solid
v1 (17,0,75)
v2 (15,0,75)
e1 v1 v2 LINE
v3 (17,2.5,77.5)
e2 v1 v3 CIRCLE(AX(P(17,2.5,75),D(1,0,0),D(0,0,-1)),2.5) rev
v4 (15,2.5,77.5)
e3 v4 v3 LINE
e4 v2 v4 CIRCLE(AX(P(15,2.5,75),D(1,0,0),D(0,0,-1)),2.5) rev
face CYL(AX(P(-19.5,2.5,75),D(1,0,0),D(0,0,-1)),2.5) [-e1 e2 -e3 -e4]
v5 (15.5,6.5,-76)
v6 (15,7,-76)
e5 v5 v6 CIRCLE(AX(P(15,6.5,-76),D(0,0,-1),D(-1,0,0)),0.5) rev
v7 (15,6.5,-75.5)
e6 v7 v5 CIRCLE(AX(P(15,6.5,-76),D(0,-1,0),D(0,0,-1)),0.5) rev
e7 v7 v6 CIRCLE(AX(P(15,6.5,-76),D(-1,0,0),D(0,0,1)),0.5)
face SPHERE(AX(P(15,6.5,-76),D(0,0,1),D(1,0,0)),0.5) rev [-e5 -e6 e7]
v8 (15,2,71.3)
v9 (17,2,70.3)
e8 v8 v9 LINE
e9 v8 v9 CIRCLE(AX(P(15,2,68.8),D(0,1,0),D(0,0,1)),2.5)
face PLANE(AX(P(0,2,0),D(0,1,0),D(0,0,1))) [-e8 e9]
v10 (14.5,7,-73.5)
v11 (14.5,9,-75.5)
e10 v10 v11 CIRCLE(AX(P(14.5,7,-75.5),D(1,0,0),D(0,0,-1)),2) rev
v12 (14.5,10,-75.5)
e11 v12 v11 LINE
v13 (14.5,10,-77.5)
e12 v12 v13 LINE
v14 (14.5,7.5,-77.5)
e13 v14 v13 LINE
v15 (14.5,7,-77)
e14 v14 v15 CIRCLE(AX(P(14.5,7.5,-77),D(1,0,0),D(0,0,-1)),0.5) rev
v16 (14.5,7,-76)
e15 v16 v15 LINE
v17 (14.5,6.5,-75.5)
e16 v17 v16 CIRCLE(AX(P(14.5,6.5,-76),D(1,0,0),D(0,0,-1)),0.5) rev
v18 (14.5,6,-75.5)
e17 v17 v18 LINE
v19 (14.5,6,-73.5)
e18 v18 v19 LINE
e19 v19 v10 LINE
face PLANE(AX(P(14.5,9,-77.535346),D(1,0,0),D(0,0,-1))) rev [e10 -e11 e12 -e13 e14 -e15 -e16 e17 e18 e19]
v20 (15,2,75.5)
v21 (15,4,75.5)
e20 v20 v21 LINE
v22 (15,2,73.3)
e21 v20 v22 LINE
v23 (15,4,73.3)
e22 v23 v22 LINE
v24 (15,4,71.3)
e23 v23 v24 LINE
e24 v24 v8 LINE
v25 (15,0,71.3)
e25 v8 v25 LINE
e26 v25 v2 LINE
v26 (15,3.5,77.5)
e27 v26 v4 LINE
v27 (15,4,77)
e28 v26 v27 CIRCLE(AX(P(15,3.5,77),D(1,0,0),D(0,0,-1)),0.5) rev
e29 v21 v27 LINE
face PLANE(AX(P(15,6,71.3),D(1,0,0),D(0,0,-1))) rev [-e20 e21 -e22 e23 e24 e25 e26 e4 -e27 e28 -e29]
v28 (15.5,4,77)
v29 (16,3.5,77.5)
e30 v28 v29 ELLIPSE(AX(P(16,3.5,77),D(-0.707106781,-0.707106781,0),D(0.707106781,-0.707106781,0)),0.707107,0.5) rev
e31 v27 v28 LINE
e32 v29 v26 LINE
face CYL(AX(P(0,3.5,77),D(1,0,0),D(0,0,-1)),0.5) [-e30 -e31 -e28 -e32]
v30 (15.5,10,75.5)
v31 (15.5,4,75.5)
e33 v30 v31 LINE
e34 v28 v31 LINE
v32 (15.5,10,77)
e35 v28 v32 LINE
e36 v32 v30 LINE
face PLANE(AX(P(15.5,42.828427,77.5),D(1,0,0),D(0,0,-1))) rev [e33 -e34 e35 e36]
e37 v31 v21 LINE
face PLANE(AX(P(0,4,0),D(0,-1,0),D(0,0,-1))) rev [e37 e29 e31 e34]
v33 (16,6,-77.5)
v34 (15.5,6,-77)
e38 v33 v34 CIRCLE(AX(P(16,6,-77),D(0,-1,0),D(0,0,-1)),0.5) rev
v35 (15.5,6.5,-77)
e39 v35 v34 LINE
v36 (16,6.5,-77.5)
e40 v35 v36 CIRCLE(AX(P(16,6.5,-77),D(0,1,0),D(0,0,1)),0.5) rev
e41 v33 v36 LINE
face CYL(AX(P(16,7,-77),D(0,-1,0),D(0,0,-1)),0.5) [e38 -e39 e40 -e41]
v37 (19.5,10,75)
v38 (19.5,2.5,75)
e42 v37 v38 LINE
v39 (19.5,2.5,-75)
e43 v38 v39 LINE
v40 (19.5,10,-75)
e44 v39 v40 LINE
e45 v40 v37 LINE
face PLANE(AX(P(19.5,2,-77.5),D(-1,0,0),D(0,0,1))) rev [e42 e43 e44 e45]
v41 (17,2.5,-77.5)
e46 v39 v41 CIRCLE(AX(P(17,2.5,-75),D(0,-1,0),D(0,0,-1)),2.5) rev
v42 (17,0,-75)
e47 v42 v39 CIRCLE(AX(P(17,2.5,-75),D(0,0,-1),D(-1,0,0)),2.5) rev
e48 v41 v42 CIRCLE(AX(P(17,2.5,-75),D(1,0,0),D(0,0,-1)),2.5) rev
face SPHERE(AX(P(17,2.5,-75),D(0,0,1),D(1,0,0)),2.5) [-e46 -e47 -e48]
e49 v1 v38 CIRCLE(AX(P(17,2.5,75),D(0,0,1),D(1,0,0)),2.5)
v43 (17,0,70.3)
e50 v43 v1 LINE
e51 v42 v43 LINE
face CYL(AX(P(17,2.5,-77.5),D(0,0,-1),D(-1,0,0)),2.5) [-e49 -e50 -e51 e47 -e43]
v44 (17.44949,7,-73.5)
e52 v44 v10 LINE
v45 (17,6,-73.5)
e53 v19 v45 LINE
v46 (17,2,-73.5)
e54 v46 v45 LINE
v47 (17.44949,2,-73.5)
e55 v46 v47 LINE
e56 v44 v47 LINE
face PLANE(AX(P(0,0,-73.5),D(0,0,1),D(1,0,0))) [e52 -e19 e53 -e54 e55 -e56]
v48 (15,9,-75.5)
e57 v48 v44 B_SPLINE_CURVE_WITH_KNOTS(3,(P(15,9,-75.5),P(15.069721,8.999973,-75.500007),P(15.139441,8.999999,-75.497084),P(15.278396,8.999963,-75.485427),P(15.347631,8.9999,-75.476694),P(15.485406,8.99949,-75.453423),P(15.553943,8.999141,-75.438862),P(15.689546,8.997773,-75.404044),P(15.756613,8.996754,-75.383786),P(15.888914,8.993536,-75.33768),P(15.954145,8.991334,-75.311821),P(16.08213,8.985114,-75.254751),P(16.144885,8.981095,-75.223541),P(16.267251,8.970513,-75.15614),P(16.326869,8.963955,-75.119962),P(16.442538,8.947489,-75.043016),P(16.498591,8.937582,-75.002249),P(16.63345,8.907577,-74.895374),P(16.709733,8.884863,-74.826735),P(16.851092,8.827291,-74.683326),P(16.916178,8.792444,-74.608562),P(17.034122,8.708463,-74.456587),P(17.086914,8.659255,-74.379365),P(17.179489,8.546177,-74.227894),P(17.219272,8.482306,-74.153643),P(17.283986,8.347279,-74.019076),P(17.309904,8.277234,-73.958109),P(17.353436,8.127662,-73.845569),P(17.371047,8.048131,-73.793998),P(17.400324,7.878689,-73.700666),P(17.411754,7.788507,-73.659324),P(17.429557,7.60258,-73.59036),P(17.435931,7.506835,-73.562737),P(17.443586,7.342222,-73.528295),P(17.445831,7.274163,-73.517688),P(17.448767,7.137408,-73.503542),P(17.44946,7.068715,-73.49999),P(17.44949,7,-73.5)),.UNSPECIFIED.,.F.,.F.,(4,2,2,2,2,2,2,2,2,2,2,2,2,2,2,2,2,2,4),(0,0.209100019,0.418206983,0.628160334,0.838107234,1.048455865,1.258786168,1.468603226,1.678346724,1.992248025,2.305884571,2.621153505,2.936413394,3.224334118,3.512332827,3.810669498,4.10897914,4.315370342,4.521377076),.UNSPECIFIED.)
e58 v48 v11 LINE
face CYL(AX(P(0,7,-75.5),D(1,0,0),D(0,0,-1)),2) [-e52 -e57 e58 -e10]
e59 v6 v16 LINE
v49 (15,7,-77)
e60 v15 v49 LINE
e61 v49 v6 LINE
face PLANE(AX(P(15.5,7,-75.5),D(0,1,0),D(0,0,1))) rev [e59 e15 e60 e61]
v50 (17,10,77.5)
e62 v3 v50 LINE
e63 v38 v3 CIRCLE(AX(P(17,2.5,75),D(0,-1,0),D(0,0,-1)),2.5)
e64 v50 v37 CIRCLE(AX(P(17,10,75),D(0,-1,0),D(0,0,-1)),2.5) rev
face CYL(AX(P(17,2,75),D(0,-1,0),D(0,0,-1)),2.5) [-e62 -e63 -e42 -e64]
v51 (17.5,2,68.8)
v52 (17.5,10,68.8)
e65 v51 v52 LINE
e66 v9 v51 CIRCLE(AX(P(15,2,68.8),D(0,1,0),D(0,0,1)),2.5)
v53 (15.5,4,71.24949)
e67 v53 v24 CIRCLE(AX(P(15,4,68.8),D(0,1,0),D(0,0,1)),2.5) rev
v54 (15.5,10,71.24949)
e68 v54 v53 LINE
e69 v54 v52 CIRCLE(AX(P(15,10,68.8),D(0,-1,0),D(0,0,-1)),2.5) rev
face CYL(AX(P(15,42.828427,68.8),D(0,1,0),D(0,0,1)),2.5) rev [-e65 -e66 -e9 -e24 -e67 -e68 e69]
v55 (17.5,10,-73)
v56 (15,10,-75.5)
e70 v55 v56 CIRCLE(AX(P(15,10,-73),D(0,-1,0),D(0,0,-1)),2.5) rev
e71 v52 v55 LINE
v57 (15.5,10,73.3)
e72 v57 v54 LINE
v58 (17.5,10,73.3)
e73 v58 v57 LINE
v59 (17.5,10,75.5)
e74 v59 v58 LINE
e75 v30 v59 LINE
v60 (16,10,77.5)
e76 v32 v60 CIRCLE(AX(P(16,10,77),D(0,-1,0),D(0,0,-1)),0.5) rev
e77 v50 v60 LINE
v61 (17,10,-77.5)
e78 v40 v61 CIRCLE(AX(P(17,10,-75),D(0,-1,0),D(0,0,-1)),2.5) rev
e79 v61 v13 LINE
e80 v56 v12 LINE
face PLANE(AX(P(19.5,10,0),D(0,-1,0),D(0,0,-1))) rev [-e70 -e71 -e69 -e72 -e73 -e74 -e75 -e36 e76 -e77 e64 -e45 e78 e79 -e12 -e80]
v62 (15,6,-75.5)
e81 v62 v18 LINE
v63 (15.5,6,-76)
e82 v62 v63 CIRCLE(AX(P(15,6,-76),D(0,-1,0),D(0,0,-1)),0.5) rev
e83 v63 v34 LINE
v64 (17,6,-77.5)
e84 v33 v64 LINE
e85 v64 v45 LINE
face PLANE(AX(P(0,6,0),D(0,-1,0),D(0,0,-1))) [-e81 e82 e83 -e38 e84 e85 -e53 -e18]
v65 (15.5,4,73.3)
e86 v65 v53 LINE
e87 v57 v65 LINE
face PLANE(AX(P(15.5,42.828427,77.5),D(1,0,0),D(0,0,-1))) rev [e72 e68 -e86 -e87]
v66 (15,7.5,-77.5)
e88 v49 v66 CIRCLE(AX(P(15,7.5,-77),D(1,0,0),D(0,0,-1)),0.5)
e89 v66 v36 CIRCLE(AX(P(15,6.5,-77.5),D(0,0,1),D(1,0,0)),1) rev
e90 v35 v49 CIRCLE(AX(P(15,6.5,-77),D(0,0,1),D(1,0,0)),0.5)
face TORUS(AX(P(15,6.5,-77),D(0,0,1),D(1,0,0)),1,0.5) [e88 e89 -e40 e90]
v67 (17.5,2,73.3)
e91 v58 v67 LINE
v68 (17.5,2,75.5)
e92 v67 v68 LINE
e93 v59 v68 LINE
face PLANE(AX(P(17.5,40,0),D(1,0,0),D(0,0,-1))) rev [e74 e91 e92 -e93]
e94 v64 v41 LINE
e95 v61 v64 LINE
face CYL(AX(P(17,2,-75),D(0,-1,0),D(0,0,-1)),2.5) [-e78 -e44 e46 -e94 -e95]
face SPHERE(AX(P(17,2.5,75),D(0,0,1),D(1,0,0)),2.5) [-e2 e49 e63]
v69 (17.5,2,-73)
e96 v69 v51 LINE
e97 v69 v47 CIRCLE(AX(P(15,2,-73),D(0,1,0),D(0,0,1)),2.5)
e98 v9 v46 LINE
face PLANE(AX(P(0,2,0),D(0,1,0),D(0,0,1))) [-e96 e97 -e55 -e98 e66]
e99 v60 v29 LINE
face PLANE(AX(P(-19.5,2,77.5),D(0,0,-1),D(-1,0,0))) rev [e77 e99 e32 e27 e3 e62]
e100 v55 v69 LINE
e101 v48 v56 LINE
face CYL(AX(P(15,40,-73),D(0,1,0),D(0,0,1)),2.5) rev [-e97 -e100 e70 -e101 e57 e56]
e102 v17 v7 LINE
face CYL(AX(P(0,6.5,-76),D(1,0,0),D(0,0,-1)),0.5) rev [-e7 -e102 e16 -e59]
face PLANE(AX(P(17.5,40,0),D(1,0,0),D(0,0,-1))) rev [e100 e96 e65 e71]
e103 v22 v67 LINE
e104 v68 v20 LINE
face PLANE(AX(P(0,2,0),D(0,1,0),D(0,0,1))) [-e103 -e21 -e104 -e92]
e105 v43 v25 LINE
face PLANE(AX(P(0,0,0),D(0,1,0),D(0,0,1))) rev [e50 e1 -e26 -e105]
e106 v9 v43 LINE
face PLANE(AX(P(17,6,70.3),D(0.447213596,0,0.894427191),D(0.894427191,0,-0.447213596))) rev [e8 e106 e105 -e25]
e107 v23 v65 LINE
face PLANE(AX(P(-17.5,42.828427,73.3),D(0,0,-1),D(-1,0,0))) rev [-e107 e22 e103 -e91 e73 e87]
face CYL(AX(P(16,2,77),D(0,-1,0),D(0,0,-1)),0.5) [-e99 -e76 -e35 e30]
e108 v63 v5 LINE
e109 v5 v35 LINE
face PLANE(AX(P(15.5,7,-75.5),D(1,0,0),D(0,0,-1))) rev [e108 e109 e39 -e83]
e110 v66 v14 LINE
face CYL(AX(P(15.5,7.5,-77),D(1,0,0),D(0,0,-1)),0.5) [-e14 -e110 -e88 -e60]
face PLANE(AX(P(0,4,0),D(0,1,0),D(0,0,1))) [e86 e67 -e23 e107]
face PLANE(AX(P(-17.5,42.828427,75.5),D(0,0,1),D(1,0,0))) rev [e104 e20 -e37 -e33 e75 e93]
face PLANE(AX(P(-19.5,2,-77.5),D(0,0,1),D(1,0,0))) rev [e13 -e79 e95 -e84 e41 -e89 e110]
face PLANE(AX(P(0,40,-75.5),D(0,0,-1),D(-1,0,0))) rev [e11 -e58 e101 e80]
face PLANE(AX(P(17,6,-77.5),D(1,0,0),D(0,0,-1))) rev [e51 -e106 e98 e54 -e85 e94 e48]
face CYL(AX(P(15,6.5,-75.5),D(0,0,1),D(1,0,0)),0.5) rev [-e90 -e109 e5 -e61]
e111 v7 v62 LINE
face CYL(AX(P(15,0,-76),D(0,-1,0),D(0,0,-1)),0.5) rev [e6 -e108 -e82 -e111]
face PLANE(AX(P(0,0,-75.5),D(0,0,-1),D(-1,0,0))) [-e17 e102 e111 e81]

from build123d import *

# Parameters (mm, degrees)
SKETCH1_W                       = 39
SKETCH1_H                       = 155
BOSS_EXTRUDE1_DEPTH             = 2
BOSS_EXTRUDE2_DEPTH             = 38
SKETCH3_W                       = 2
SKETCH3_H                       = 2
BOSS_EXTRUDE3_DEPTH             = 38
SKETCH4_W                       = 2
SKETCH4_H                       = 2
BOSS_EXTRUDE4_DEPTH             = 151
SKETCH6_W                       = 35
SKETCH6_H                       = 2.2
CUT_EXTRUDE1_DEPTH              = 160.340045186
SKETCH7_W                       = 35
SKETCH7_H                       = 2.2
CUT_EXTRUDE2_DEPTH              = 89.490112442
SKETCH5_W                       = 31
SKETCH5_H                       = 2
BOSS_EXTRUDE5_DEPTH             = 2
BOSS_EXTRUDE6_REACH             = 91.367
SKETCH8_W                       = 2
SKETCH8_H                       = 2
BOSS_EXTRUDE6_DIRECTION_2_REACH = 91.367
SKETCH10_W                      = 2
SKETCH10_H                      = 2.2
SKETCH10_W_2                    = 2.2
SKETCH10_H_2                    = 2
BOSS_EXTRUDE8_DEPTH             = 2
SKETCH11_W                      = 2
SKETCH11_H                      = 2.2
SKETCH11_W_2                    = 2.2
SKETCH11_H_2                    = 2
BOSS_EXTRUDE9_DEPTH             = 2
FILLET2_R                       = 2.5
SKETCH14_W                      = 36.5
SKETCH14_H                      = 7.75
BOSS_EXTRUDE10_DEPTH            = 2
SKETCH13_W                      = 31
SKETCH13_H                      = 3
CUT_EXTRUDE4_DEPTH              = 2
FILLET3_R                       = 2
FILLET4_R                       = 0.5
SKETCH15_R                      = 5.1
CUT_EXTRUDE5_DEPTH              = 90.367219941
SKETCH16_R                      = 7.1
BOSS_EXTRUDE11_DEPTH            = 1
FILLET5_R                       = 0.5
CUT_EXTRUDE3_DEPTH              = 160.340045186
FILLET6_R                       = 0.4
FILLET7_R                       = 0.5
CUT_EXTRUDE6_DEPTH              = 6
SKETCH18_W                      = 29
SKETCH18_H                      = 3
CUT_EXTRUDE8_DEPTH              = 90.367220028
CUT_EXTRUDE11_DEPTH             = 90.367220028
CUT_EXTRUDE11_DEPTH_BACK        = 90.367220028
SKETCH20_W                      = 29
SKETCH20_H                      = 34
SKETCH21_W                      = 155
SKETCH21_H                      = 20
SKETCH21_H_2                    = 10
CUT_EXTRUDE12_DEPTH             = 90.367219941


with BuildPart() as part:
    # Sketch1 → Boss-Extrude1 (new body)
    with BuildSketch(Plane(origin=(0, 0, 0), x_dir=(1, 0, 0), z_dir=(0, 1, 0))):
        Rectangle(SKETCH1_W, SKETCH1_H)
    extrude(amount=BOSS_EXTRUDE1_DEPTH)

    # Sketch2 → Boss-Extrude2 (add)
    with BuildSketch(Plane(origin=(0, 2, 0), x_dir=(1, 0, 0), z_dir=(0, 1, 0))):
        Polygon((-17.5, -77.5), (-17.5, -75.5), (-17.5, 75.5), (17.5, 75.5), (17.5, -75.5), (17.5, -77.5), (19.5, -77.5), (19.5, 77.5), (-19.5, 77.5), (-19.5, -77.5), align=None)
    extrude(amount=BOSS_EXTRUDE2_DEPTH)

    # Sketch3 → Boss-Extrude3 (add)
    with BuildSketch(Plane(origin=(0, 2, 0), x_dir=(1, 0, 0), z_dir=(0, 1, 0))):
        with Locations((-16.5, -76.5)):
            Rectangle(SKETCH3_W, SKETCH3_H)
        with Locations((-16.5, -72.3)):
            Rectangle(SKETCH3_W, SKETCH3_H)
        with Locations((16.5, -76.5)):
            Rectangle(SKETCH3_W, SKETCH3_H)
        with Locations((16.5, -72.3)):
            Rectangle(SKETCH3_W, SKETCH3_H)
    extrude(amount=BOSS_EXTRUDE3_DEPTH)

    # Sketch4 → Boss-Extrude4 (add)
    with BuildSketch(Plane.XY.offset(-75.5)):
        with Locations((-16.5, 39)):
            Rectangle(SKETCH4_W, SKETCH4_H)
        Polygon((-15.5, 33.8), (-17.5, 31.8), (-17.5, 35.8), (-15.5, 35.8), align=None)
        Polygon((15.5, 35.8), (17.5, 35.8), (17.5, 31.8), (15.5, 33.8), align=None)
        with Locations((16.5, 39)):
            Rectangle(SKETCH4_W, SKETCH4_H)
    extrude(amount=BOSS_EXTRUDE4_DEPTH)

    # Sketch6 → Cut-Extrude1 (cut, through all)
    with BuildSketch(Plane.XY.offset(-75.5)):
        with Locations((0, 36.9)):
            Rectangle(SKETCH6_W, SKETCH6_H)
    extrude(amount=CUT_EXTRUDE1_DEPTH, mode=Mode.SUBTRACT)

    # Sketch7 → Cut-Extrude2 (cut, through all)
    with BuildSketch(Plane(origin=(0, 2, 0), x_dir=(1, 0, 0), z_dir=(0, 1, 0))):
        with Locations((0, -74.4)):
            Rectangle(SKETCH7_W, SKETCH7_H)
    extrude(amount=CUT_EXTRUDE2_DEPTH, mode=Mode.SUBTRACT)

    # Sketch5 → Boss-Extrude5 (add)
    with BuildSketch(Plane(origin=(0, 2, 0), x_dir=(1, 0, 0), z_dir=(0, 1, 0))):
        with Locations((0, -76.5)):
            Rectangle(SKETCH5_W, SKETCH5_H)
        with Locations((0, -72.3)):
            Rectangle(SKETCH5_W, SKETCH5_H)
    extrude(amount=BOSS_EXTRUDE5_DEPTH)

    # Boss-Extrude6: up to this face of the body (flat: up to its plane)
    boss_extrude6_end = Plane(part.part.faces().sort_by_distance((17.5, 16.9, -2.1))[0])
    # Sketch8 → Boss-Extrude6 (add, up to the picked face)
    with BuildSketch(Plane(origin=(0, 0, 0), x_dir=(0, 0, -1), z_dir=(1, 0, 0)), mode=Mode.PRIVATE) as boss_extrude6_sk1:
        with Locations((74.5, 39)):
            Rectangle(SKETCH8_W, SKETCH8_H)
    boss_extrude6_tool1 = split(extrude(boss_extrude6_sk1.sketch, amount=BOSS_EXTRUDE6_REACH, mode=Mode.PRIVATE), bisect_by=boss_extrude6_end, keep=Keep.BOTH, mode=Mode.PRIVATE)
    # Sketch8 → Boss-Extrude6 (add, up to the picked face)
    with BuildSketch(Plane(origin=(0, 0, 0), x_dir=(0, 0, -1), z_dir=(1, 0, 0)), mode=Mode.PRIVATE) as boss_extrude6_sk2:
        Polygon((75.5, 35.8), (73.5, 35.8), (73.5, 33.8), (75.5, 31.8), align=None)
    boss_extrude6_tool2 = split(extrude(boss_extrude6_sk2.sketch, amount=BOSS_EXTRUDE6_REACH, mode=Mode.PRIVATE), bisect_by=boss_extrude6_end, keep=Keep.BOTH, mode=Mode.PRIVATE)
    add(boss_extrude6_tool1.solids().sort_by(Axis((0, 39, -74.5), (1, 0, 0)))[0])
    add(boss_extrude6_tool2.solids().sort_by(Axis((0, 34.244444, -74.611111), (1, 0, 0)))[0])

    # Boss-Extrude6 direction 2: up to this face of the body (flat: up to its plane)
    boss_extrude6_direction_2_end = Plane(part.part.faces().sort_by_distance((-17.5, 16.9, -2.1))[0])
    # Sketch8 → Boss-Extrude6 direction 2 (add, up to the picked face)
    with BuildSketch(Plane(origin=(0, 0, 0), x_dir=(0, 0, -1), z_dir=(1, 0, 0)), mode=Mode.PRIVATE) as boss_extrude6_direction_2_sk1:
        with Locations((74.5, 39)):
            Rectangle(SKETCH8_W, SKETCH8_H)
    boss_extrude6_direction_2_tool1 = split(extrude(boss_extrude6_direction_2_sk1.sketch, amount=-BOSS_EXTRUDE6_DIRECTION_2_REACH, mode=Mode.PRIVATE), bisect_by=boss_extrude6_direction_2_end, keep=Keep.BOTH, mode=Mode.PRIVATE)
    # Sketch8 → Boss-Extrude6 direction 2 (add, up to the picked face)
    with BuildSketch(Plane(origin=(0, 0, 0), x_dir=(0, 0, -1), z_dir=(1, 0, 0)), mode=Mode.PRIVATE) as boss_extrude6_direction_2_sk2:
        Polygon((75.5, 35.8), (73.5, 35.8), (73.5, 33.8), (75.5, 31.8), align=None)
    boss_extrude6_direction_2_tool2 = split(extrude(boss_extrude6_direction_2_sk2.sketch, amount=-BOSS_EXTRUDE6_DIRECTION_2_REACH, mode=Mode.PRIVATE), bisect_by=boss_extrude6_direction_2_end, keep=Keep.BOTH, mode=Mode.PRIVATE)
    add(boss_extrude6_direction_2_tool1.solids().sort_by(Axis((0, 39, -74.5), (-1, 0, 0)))[0])
    add(boss_extrude6_direction_2_tool2.solids().sort_by(Axis((0, 34.244444, -74.611111), (-1, 0, 0)))[0])

    # Sketch10 → Boss-Extrude8 (add)
    with BuildSketch(Plane(origin=(-17.5, 0, 0), x_dir=(0, 0, -1), z_dir=(1, 0, 0))):
        with Locations((-76.5, 36.9)):
            Rectangle(SKETCH10_W, SKETCH10_H)
        with Locations((-74.4, 39)):
            Rectangle(SKETCH10_W_2, SKETCH10_H_2)
    extrude(amount=BOSS_EXTRUDE8_DEPTH)

    # Sketch11 → Boss-Extrude9 (add)
    with BuildSketch(Plane.ZY.offset(-17.5)):
        with Locations((76.5, 36.9)):
            Rectangle(SKETCH11_W, SKETCH11_H)
        with Locations((74.4, 39)):
            Rectangle(SKETCH11_W_2, SKETCH11_H_2)
    extrude(amount=BOSS_EXTRUDE9_DEPTH)

    # Fillet2
    fillet2_edges = [part.edges().sort_by_distance(p)[0] for p in [
        (-17.5, 16.9, 71.3),
        (17.5, 16.9, 71.3),
        (19.5, 20, 77.5),
        (-19.5, 20, 77.5),
        (-19.5, 20, -77.5),
        (-17.5, 16.9, -75.5),
        (17.5, 16.9, -75.5),
        (19.5, 20, -77.5),
        (19.5, 40, 0),
        (-19.5, 40, 0),
        (19.5, 0, 0),
        (-19.5, 0, 0),
        (0, 40, -77.5),
        (0, 0, 77.5),
        (0, 0, -77.5),
        (-17.5, 40, 77.5),
        (17.5, 40, 77.5),
    ]]
    fillet(fillet2_edges, radius=FILLET2_R)

    # Sketch14 → Boss-Extrude10 (add)
    with BuildSketch(Plane.XY.offset(-75.5)):
        with Locations((0, 5.125)):
            Rectangle(SKETCH14_W, SKETCH14_H)
    extrude(amount=BOSS_EXTRUDE10_DEPTH)

    # Sketch13 → Cut-Extrude4 (cut)
    with BuildSketch(Plane(origin=(0, 0, -77.5), x_dir=(-1, 0, 0), z_dir=(0, 0, -1))):
        with Locations((0, 5.5)):
            Rectangle(SKETCH13_W, SKETCH13_H)
    extrude(amount=-CUT_EXTRUDE4_DEPTH, mode=Mode.SUBTRACT)

    # Fillet3
    fillet3_edges = [part.edges().sort_by_distance(p)[0] for p in [
        (0, 9, -73.5),
    ]]
    fillet(fillet3_edges, radius=FILLET3_R - 0.0001)  # a hair under: the kernel refuses the full size

    # Fillet4
    fillet4_edges = [part.edges().sort_by_distance(p)[0] for p in [
        (15.5, 5.5, -75.5),
        (15.5, 4, -76.5),
        (0, 7, -75.5),
        (15.5, 7, -76.5),
        (-15.5, 5.5, -75.5),
        (-15.5, 7, -76.5),
        (0, 4, -75.5),
        (-15.5, 4, -76.5),
        (15.5, 5.5, -77.5),
        (0, 4, -77.5),
        (-15.5, 5.5, -77.5),
        (0, 7, -77.5),
    ]]
    fillet(fillet4_edges, radius=FILLET4_R)

    # Sketch15 → Cut-Extrude5 (cut, through all)
    with BuildSketch(Plane.XZ):
        with Locations(Location((0, 38.75, 0), (0, 0, 270))):
            Circle(SKETCH15_R)
        with Locations(Location((0, -38.75, 0), (0, 0, 270))):
            Circle(SKETCH15_R)
    extrude(amount=-CUT_EXTRUDE5_DEPTH, mode=Mode.SUBTRACT)

    # Sketch16 → Boss-Extrude11 (add)
    with BuildSketch(Plane(origin=(0, 2, 0), x_dir=(1, 0, 0), z_dir=(0, 1, 0))):
        with Locations(Location((0, 38.75, 0), (0, 0, 270))):
            Circle(SKETCH16_R)
        with Locations(Location((0, -38.75, 0), (0, 0, 270))):
            Circle(SKETCH16_R)
    extrude(amount=BOSS_EXTRUDE11_DEPTH)

    # Fillet5
    fillet5_edges = [part.edges().sort_by_distance(p)[0] for p in [
        (0, 2, -45.85),
        (0, 3, -45.85),
        (0, 2, 31.65),
        (0, 3, 31.65),
    ]]
    fillet(fillet5_edges, radius=FILLET5_R - 0.0001)  # a hair under: the kernel refuses the full size

    # Sketch12 → Cut-Extrude3 (cut, through all)
    with BuildSketch(Plane.XY.offset(-75.5)):
        with BuildLine():
            Line((1.668907005, 12.688040659), (2.22520934, 10.250720878))
            ThreePointArc((2.22520934, 10.250720878), (4.338837391, 10.990311321), (6.234898019, 12.181685175))
            Line((6.234898019, 12.181685175), (4.676173514, 14.136263881))
            ThreePointArc((4.676173514, 14.136263881), (3.254128043, 13.242733491), (1.668907005, 12.688040659))
        make_face()
        with BuildLine():
            ThreePointArc((-6.234898019, 12.181685175), (-4.338837391, 10.990311321), (-2.22520934, 10.250720878))
            Line((-2.22520934, 10.250720878), (-1.668907005, 12.688040659))
            ThreePointArc((-1.668907005, 12.688040659), (-3.254128043, 13.242733491), (-4.676173514, 14.136263881))
            Line((-4.676173514, 14.136263881), (-6.234898019, 12.181685175))
        make_face()
        with BuildLine():
            ThreePointArc((-10, 20), (-9.749279122, 17.77479066), (-9.009688679, 15.661162609))
            Line((-9.009688679, 15.661162609), (-6.757266509, 16.745871957))
            ThreePointArc((-6.757266509, 16.745871957), (-7.311959341, 18.331092995), (-7.5, 20))
            Line((-7.5, 20), (-10, 20))
        make_face()
        with BuildLine():
            ThreePointArc((-6.234898019, 27.818314825), (-7.818314825, 26.234898019), (-9.009688679, 24.338837391))
            Line((-9.009688679, 24.338837391), (-6.757266509, 23.254128043))
            ThreePointArc((-6.757266509, 23.254128043), (-5.863736119, 24.676173514), (-4.676173514, 25.863736119))
            Line((-4.676173514, 25.863736119), (-6.234898019, 27.818314825))
        make_face()
        with BuildLine():
            ThreePointArc((-1.668907005, 27.311959341), (-0.839733571, 27.452841574), (0, 27.5))
            Line((0, 27.5), (0, 30))
            ThreePointArc((0, 30), (-1.119644761, 29.937122099), (-2.22520934, 29.749279122))
            Line((-2.22520934, 29.749279122), (-1.668907005, 27.311959341))
        make_face()
        with BuildLine():
            Line((0, 30), (0, 27.5))
            ThreePointArc((0, 27.5), (0.839733571, 27.452841574), (1.668907005, 27.311959341))
            Line((1.668907005, 27.311959341), (2.22520934, 29.749279122))
            ThreePointArc((2.22520934, 29.749279122), (1.119644761, 29.937122099), (0, 30))
        make_face()
        with BuildLine():
            Line((6.757266509, 23.254128043), (9.009688679, 24.338837391))
            ThreePointArc((9.009688679, 24.338837391), (7.818314825, 26.234898019), (6.234898019, 27.818314825))
            Line((6.234898019, 27.818314825), (4.676173514, 25.863736119))
            ThreePointArc((4.676173514, 25.863736119), (5.863736119, 24.676173514), (6.757266509, 23.254128043))
        make_face()
        with BuildLine():
            Line((6.757266509, 16.745871957), (9.009688679, 15.661162609))
            ThreePointArc((9.009688679, 15.661162609), (9.749279122, 17.77479066), (10, 20))
            Line((10, 20), (7.5, 20))
            ThreePointArc((7.5, 20), (7.311959341, 18.331092995), (6.757266509, 16.745871957))
        make_face()
        with BuildLine():
            ThreePointArc((2.5, 20), (2.43731978, 19.443697665), (2.25242217, 18.915290652))
            Line((2.25242217, 18.915290652), (4.50484434, 17.830581304))
            ThreePointArc((4.50484434, 17.830581304), (4.874639561, 18.88739533), (5, 20))
            Line((5, 20), (2.5, 20))
        make_face()
        with BuildLine():
            ThreePointArc((1.558724505, 21.954578706), (1.954578706, 21.558724505), (2.25242217, 21.084709348))
            Line((2.25242217, 21.084709348), (4.50484434, 22.169418696))
            ThreePointArc((4.50484434, 22.169418696), (3.909157412, 23.117449009), (3.117449009, 23.909157412))
            Line((3.117449009, 23.909157412), (1.558724505, 21.954578706))
        make_face()
        with BuildLine():
            Line((0, 25), (0, 22.5))
            ThreePointArc((0, 22.5), (0.27991119, 22.484280525), (0.556302335, 22.43731978))
            Line((0.556302335, 22.43731978), (1.11260467, 24.874639561))
            ThreePointArc((1.11260467, 24.874639561), (0.559822381, 24.968561049), (0, 25))
        make_face()
        with BuildLine():
            ThreePointArc((-0.556302335, 22.43731978), (-0.27991119, 22.484280525), (0, 22.5))
            Line((0, 22.5), (0, 25))
            ThreePointArc((0, 25), (-0.559822381, 24.968561049), (-1.11260467, 24.874639561))
            Line((-1.11260467, 24.874639561), (-0.556302335, 22.43731978))
        make_face()
        with BuildLine():
            ThreePointArc((-2.25242217, 21.084709348), (-1.954578706, 21.558724505), (-1.558724505, 21.954578706))
            Line((-1.558724505, 21.954578706), (-3.117449009, 23.909157412))
            ThreePointArc((-3.117449009, 23.909157412), (-3.909157412, 23.117449009), (-4.50484434, 22.169418696))
            Line((-4.50484434, 22.169418696), (-2.25242217, 21.084709348))
        make_face()
        with BuildLine():
            ThreePointArc((-2.25242217, 18.915290652), (-2.43731978, 19.443697665), (-2.5, 20))
            Line((-2.5, 20), (-5, 20))
            ThreePointArc((-5, 20), (-4.874639561, 18.88739533), (-4.50484434, 17.830581304))
            Line((-4.50484434, 17.830581304), (-2.25242217, 18.915290652))
        make_face()
        with BuildLine():
            ThreePointArc((-3.117449009, 16.090842588), (-2.169418696, 15.49515566), (-1.11260467, 15.125360439))
            Line((-1.11260467, 15.125360439), (-0.556302335, 17.56268022))
            ThreePointArc((-0.556302335, 17.56268022), (-1.084709348, 17.74757783), (-1.558724505, 18.045421294))
            Line((-1.558724505, 18.045421294), (-3.117449009, 16.090842588))
        make_face()
        with BuildLine():
            Line((0.556302335, 17.56268022), (1.11260467, 15.125360439))
            ThreePointArc((1.11260467, 15.125360439), (2.169418696, 15.49515566), (3.117449009, 16.090842588))
            Line((3.117449009, 16.090842588), (1.558724505, 18.045421294))
            ThreePointArc((1.558724505, 18.045421294), (1.084709348, 17.74757783), (0.556302335, 17.56268022))
        make_face()
    extrude(amount=-CUT_EXTRUDE3_DEPTH, mode=Mode.SUBTRACT)

    # Fillet6
    fillet6_edges = [part.edges().sort_by_distance(p)[0] for p in [
        (5.863736119, 24.676173514, -75.5),
        (5.455535766, 26.841025472, -75.5),
        (7.818314825, 26.234898019, -77.5),
        (7.883477594, 23.796482717, -77.5),
        (5.863736119, 24.676173514, -77.5),
        (5.455535766, 26.841025472, -77.5),
        (7.883477594, 23.796482717, -75.5),
        (7.818314825, 26.234898019, -75.5),
        (7.311959341, 18.331092995, -75.5),
        (8.75, 20, -75.5),
        (9.749279122, 17.77479066, -77.5),
        (7.883477594, 16.203517283, -77.5),
        (7.311959341, 18.331092995, -77.5),
        (8.75, 20, -77.5),
        (7.883477594, 16.203517283, -75.5),
        (9.749279122, 17.77479066, -75.5),
        (2.43731978, 19.443697665, -75.5),
        (3.75, 20, -75.5),
        (4.874639561, 18.88739533, -77.5),
        (3.378633255, 18.372935978, -77.5),
        (2.43731978, 19.443697665, -77.5),
        (3.75, 20, -77.5),
        (3.378633255, 18.372935978, -75.5),
        (4.874639561, 18.88739533, -75.5),
        (1.954578706, 21.558724505, -75.5),
        (2.338086757, 22.931868059, -75.5),
        (3.909157412, 23.117449009, -77.5),
        (3.378633255, 21.627064022, -77.5),
        (1.954578706, 21.558724505, -77.5),
        (2.338086757, 22.931868059, -77.5),
        (3.378633255, 21.627064022, -75.5),
        (3.909157412, 23.117449009, -75.5),
        (0, 27.5, -75.5),
        (-1.947058172, 28.530619232, -75.5),
        (0, 30, -77.5),
        (1.947058172, 28.530619232, -77.5),
        (0, 27.5, -77.5),
        (-1.947058172, 28.530619232, -77.5),
        (1.947058172, 28.530619232, -75.5),
        (0, 30, -75.5),
        (-5.863736119, 24.676173514, -75.5),
        (-7.883477594, 23.796482717, -75.5),
        (-7.818314825, 26.234898019, -77.5),
        (-5.455535766, 26.841025472, -77.5),
        (-5.863736119, 24.676173514, -77.5),
        (-7.883477594, 23.796482717, -77.5),
        (-5.455535766, 26.841025472, -75.5),
        (-7.818314825, 26.234898019, -75.5),
        (-7.311959341, 18.331092995, -75.5),
        (-7.883477594, 16.203517283, -75.5),
        (-9.749279122, 17.77479066, -77.5),
        (-8.75, 20, -77.5),
        (-7.311959341, 18.331092995, -77.5),
        (-7.883477594, 16.203517283, -77.5),
        (-8.75, 20, -75.5),
        (-9.749279122, 17.77479066, -75.5),
        (-3.254128043, 13.242733491, -75.5),
        (-1.947058172, 11.469380768, -75.5),
        (-4.338837391, 10.990311321, -77.5),
        (-5.455535766, 13.158974528, -77.5),
        (-3.254128043, 13.242733491, -77.5),
        (-1.947058172, 11.469380768, -77.5),
        (-5.455535766, 13.158974528, -75.5),
        (-4.338837391, 10.990311321, -75.5),
        (1.084709348, 17.74757783, -75.5),
        (2.338086757, 17.068131941, -75.5),
        (2.169418696, 15.49515566, -77.5),
        (0.834453502, 16.344020329, -77.5),
        (1.084709348, 17.74757783, -77.5),
        (2.338086757, 17.068131941, -77.5),
        (0.834453502, 16.344020329, -75.5),
        (2.169418696, 15.49515566, -75.5),
        (-2.43731978, 19.443697665, -75.5),
        (-3.378633255, 18.372935978, -75.5),
        (-4.874639561, 18.88739533, -77.5),
        (-3.75, 20, -77.5),
        (-2.43731978, 19.443697665, -77.5),
        (-3.378633255, 18.372935978, -77.5),
        (-3.75, 20, -75.5),
        (-4.874639561, 18.88739533, -75.5),
        (-1.084709348, 17.74757783, -75.5),
        (-0.834453502, 16.344020329, -75.5),
        (-2.169418696, 15.49515566, -77.5),
        (-2.338086757, 17.068131941, -77.5),
        (-1.084709348, 17.74757783, -77.5),
        (-0.834453502, 16.344020329, -77.5),
        (-2.338086757, 17.068131941, -75.5),
        (-2.169418696, 15.49515566, -75.5),
        (-1.954578706, 21.558724505, -75.5),
        (-3.378633255, 21.627064022, -75.5),
        (-3.909157412, 23.117449009, -77.5),
        (-2.338086757, 22.931868059, -77.5),
        (-1.954578706, 21.558724505, -77.5),
        (-3.378633255, 21.627064022, -77.5),
        (-2.338086757, 22.931868059, -75.5),
        (-3.909157412, 23.117449009, -75.5),
        (0, 25, -77.5),
        (0.834453502, 23.655979671, -77.5),
        (0, 22.5, -75.5),
        (-0.834453502, 23.655979671, -75.5),
        (0, 22.5, -77.5),
        (-0.834453502, 23.655979671, -77.5),
        (0, 25, -75.5),
        (0.834453502, 23.655979671, -75.5),
        (3.254128043, 13.242733491, -75.5),
        (5.455535766, 13.158974528, -75.5),
        (4.338837391, 10.990311321, -77.5),
        (1.947058172, 11.469380768, -77.5),
        (3.254128043, 13.242733491, -77.5),
        (5.455535766, 13.158974528, -77.5),
        (1.947058172, 11.469380768, -75.5),
        (4.338837391, 10.990311321, -75.5),
    ]]
    fillet(fillet6_edges, radius=FILLET6_R)

    # Fillet7
    fillet7_edges = [part.edges().sort_by_distance(p)[0] for p in [
        (15.5, 40, 0.75),
        (0, 4, 77.5),
        (0, 40, -73.5),
        (-15.5, 40, 0.75),
        (-15.5, 20.75, 77.5),
        (-15.5, 39.267766953, 76.767766953),
        (15.5, 20.75, 77.5),
        (15.5, 39.267766953, 76.767766953),
    ]]
    fillet(fillet7_edges, radius=FILLET7_R)

    # Sketch17 → Cut-Extrude6 (cut)
    with BuildSketch(Plane.XZ):
        Polygon((-17, -77.5), (-17, 70.299999999), (-14.999999999, 71.3), (-14.999999999, 77.5), (14.999999999, 77.5), (14.999999999, 71.3), (17, 70.299999999), (17, -77.5), align=None)
    extrude(amount=-CUT_EXTRUDE6_DEPTH, mode=Mode.SUBTRACT)

    # Sketch18 → Cut-Extrude8 (cut, through all)
    with BuildSketch(Plane.XY):
        with Locations((0, 7.5)):
            Rectangle(SKETCH18_W, SKETCH18_H)
    extrude(amount=-CUT_EXTRUDE8_DEPTH, mode=Mode.SUBTRACT)

    # Sketch20 → Cut-Extrude11 (cut, two sides: drawn at the far end of the back side and taken through both)
    with BuildSketch(Plane.XY.offset(-CUT_EXTRUDE11_DEPTH_BACK)):
        with Locations((0, 23)):
            Rectangle(SKETCH20_W, SKETCH20_H)
    extrude(amount=CUT_EXTRUDE11_DEPTH + CUT_EXTRUDE11_DEPTH_BACK, mode=Mode.SUBTRACT)


with BuildPart() as body_2:
    # of the pieces the cut leaves, the one that is kept (cut_extrude11_keep)
    add(part.part.solids().sort_by_distance((14.5, 40, -75))[0])

    # Sketch21 → Cut-Extrude12 (cut, through all)
    with BuildSketch(Plane(origin=(0, 0, 0), x_dir=(0, 0, -1), z_dir=(1, 0, 0))):
        with Locations((0, 20)):
            Rectangle(SKETCH21_W, SKETCH21_H)
        with Locations((0, 35)):
            Rectangle(SKETCH21_W, SKETCH21_H_2)
    extrude(amount=CUT_EXTRUDE12_DEPTH, mode=Mode.SUBTRACT)


solid = body_2.part
